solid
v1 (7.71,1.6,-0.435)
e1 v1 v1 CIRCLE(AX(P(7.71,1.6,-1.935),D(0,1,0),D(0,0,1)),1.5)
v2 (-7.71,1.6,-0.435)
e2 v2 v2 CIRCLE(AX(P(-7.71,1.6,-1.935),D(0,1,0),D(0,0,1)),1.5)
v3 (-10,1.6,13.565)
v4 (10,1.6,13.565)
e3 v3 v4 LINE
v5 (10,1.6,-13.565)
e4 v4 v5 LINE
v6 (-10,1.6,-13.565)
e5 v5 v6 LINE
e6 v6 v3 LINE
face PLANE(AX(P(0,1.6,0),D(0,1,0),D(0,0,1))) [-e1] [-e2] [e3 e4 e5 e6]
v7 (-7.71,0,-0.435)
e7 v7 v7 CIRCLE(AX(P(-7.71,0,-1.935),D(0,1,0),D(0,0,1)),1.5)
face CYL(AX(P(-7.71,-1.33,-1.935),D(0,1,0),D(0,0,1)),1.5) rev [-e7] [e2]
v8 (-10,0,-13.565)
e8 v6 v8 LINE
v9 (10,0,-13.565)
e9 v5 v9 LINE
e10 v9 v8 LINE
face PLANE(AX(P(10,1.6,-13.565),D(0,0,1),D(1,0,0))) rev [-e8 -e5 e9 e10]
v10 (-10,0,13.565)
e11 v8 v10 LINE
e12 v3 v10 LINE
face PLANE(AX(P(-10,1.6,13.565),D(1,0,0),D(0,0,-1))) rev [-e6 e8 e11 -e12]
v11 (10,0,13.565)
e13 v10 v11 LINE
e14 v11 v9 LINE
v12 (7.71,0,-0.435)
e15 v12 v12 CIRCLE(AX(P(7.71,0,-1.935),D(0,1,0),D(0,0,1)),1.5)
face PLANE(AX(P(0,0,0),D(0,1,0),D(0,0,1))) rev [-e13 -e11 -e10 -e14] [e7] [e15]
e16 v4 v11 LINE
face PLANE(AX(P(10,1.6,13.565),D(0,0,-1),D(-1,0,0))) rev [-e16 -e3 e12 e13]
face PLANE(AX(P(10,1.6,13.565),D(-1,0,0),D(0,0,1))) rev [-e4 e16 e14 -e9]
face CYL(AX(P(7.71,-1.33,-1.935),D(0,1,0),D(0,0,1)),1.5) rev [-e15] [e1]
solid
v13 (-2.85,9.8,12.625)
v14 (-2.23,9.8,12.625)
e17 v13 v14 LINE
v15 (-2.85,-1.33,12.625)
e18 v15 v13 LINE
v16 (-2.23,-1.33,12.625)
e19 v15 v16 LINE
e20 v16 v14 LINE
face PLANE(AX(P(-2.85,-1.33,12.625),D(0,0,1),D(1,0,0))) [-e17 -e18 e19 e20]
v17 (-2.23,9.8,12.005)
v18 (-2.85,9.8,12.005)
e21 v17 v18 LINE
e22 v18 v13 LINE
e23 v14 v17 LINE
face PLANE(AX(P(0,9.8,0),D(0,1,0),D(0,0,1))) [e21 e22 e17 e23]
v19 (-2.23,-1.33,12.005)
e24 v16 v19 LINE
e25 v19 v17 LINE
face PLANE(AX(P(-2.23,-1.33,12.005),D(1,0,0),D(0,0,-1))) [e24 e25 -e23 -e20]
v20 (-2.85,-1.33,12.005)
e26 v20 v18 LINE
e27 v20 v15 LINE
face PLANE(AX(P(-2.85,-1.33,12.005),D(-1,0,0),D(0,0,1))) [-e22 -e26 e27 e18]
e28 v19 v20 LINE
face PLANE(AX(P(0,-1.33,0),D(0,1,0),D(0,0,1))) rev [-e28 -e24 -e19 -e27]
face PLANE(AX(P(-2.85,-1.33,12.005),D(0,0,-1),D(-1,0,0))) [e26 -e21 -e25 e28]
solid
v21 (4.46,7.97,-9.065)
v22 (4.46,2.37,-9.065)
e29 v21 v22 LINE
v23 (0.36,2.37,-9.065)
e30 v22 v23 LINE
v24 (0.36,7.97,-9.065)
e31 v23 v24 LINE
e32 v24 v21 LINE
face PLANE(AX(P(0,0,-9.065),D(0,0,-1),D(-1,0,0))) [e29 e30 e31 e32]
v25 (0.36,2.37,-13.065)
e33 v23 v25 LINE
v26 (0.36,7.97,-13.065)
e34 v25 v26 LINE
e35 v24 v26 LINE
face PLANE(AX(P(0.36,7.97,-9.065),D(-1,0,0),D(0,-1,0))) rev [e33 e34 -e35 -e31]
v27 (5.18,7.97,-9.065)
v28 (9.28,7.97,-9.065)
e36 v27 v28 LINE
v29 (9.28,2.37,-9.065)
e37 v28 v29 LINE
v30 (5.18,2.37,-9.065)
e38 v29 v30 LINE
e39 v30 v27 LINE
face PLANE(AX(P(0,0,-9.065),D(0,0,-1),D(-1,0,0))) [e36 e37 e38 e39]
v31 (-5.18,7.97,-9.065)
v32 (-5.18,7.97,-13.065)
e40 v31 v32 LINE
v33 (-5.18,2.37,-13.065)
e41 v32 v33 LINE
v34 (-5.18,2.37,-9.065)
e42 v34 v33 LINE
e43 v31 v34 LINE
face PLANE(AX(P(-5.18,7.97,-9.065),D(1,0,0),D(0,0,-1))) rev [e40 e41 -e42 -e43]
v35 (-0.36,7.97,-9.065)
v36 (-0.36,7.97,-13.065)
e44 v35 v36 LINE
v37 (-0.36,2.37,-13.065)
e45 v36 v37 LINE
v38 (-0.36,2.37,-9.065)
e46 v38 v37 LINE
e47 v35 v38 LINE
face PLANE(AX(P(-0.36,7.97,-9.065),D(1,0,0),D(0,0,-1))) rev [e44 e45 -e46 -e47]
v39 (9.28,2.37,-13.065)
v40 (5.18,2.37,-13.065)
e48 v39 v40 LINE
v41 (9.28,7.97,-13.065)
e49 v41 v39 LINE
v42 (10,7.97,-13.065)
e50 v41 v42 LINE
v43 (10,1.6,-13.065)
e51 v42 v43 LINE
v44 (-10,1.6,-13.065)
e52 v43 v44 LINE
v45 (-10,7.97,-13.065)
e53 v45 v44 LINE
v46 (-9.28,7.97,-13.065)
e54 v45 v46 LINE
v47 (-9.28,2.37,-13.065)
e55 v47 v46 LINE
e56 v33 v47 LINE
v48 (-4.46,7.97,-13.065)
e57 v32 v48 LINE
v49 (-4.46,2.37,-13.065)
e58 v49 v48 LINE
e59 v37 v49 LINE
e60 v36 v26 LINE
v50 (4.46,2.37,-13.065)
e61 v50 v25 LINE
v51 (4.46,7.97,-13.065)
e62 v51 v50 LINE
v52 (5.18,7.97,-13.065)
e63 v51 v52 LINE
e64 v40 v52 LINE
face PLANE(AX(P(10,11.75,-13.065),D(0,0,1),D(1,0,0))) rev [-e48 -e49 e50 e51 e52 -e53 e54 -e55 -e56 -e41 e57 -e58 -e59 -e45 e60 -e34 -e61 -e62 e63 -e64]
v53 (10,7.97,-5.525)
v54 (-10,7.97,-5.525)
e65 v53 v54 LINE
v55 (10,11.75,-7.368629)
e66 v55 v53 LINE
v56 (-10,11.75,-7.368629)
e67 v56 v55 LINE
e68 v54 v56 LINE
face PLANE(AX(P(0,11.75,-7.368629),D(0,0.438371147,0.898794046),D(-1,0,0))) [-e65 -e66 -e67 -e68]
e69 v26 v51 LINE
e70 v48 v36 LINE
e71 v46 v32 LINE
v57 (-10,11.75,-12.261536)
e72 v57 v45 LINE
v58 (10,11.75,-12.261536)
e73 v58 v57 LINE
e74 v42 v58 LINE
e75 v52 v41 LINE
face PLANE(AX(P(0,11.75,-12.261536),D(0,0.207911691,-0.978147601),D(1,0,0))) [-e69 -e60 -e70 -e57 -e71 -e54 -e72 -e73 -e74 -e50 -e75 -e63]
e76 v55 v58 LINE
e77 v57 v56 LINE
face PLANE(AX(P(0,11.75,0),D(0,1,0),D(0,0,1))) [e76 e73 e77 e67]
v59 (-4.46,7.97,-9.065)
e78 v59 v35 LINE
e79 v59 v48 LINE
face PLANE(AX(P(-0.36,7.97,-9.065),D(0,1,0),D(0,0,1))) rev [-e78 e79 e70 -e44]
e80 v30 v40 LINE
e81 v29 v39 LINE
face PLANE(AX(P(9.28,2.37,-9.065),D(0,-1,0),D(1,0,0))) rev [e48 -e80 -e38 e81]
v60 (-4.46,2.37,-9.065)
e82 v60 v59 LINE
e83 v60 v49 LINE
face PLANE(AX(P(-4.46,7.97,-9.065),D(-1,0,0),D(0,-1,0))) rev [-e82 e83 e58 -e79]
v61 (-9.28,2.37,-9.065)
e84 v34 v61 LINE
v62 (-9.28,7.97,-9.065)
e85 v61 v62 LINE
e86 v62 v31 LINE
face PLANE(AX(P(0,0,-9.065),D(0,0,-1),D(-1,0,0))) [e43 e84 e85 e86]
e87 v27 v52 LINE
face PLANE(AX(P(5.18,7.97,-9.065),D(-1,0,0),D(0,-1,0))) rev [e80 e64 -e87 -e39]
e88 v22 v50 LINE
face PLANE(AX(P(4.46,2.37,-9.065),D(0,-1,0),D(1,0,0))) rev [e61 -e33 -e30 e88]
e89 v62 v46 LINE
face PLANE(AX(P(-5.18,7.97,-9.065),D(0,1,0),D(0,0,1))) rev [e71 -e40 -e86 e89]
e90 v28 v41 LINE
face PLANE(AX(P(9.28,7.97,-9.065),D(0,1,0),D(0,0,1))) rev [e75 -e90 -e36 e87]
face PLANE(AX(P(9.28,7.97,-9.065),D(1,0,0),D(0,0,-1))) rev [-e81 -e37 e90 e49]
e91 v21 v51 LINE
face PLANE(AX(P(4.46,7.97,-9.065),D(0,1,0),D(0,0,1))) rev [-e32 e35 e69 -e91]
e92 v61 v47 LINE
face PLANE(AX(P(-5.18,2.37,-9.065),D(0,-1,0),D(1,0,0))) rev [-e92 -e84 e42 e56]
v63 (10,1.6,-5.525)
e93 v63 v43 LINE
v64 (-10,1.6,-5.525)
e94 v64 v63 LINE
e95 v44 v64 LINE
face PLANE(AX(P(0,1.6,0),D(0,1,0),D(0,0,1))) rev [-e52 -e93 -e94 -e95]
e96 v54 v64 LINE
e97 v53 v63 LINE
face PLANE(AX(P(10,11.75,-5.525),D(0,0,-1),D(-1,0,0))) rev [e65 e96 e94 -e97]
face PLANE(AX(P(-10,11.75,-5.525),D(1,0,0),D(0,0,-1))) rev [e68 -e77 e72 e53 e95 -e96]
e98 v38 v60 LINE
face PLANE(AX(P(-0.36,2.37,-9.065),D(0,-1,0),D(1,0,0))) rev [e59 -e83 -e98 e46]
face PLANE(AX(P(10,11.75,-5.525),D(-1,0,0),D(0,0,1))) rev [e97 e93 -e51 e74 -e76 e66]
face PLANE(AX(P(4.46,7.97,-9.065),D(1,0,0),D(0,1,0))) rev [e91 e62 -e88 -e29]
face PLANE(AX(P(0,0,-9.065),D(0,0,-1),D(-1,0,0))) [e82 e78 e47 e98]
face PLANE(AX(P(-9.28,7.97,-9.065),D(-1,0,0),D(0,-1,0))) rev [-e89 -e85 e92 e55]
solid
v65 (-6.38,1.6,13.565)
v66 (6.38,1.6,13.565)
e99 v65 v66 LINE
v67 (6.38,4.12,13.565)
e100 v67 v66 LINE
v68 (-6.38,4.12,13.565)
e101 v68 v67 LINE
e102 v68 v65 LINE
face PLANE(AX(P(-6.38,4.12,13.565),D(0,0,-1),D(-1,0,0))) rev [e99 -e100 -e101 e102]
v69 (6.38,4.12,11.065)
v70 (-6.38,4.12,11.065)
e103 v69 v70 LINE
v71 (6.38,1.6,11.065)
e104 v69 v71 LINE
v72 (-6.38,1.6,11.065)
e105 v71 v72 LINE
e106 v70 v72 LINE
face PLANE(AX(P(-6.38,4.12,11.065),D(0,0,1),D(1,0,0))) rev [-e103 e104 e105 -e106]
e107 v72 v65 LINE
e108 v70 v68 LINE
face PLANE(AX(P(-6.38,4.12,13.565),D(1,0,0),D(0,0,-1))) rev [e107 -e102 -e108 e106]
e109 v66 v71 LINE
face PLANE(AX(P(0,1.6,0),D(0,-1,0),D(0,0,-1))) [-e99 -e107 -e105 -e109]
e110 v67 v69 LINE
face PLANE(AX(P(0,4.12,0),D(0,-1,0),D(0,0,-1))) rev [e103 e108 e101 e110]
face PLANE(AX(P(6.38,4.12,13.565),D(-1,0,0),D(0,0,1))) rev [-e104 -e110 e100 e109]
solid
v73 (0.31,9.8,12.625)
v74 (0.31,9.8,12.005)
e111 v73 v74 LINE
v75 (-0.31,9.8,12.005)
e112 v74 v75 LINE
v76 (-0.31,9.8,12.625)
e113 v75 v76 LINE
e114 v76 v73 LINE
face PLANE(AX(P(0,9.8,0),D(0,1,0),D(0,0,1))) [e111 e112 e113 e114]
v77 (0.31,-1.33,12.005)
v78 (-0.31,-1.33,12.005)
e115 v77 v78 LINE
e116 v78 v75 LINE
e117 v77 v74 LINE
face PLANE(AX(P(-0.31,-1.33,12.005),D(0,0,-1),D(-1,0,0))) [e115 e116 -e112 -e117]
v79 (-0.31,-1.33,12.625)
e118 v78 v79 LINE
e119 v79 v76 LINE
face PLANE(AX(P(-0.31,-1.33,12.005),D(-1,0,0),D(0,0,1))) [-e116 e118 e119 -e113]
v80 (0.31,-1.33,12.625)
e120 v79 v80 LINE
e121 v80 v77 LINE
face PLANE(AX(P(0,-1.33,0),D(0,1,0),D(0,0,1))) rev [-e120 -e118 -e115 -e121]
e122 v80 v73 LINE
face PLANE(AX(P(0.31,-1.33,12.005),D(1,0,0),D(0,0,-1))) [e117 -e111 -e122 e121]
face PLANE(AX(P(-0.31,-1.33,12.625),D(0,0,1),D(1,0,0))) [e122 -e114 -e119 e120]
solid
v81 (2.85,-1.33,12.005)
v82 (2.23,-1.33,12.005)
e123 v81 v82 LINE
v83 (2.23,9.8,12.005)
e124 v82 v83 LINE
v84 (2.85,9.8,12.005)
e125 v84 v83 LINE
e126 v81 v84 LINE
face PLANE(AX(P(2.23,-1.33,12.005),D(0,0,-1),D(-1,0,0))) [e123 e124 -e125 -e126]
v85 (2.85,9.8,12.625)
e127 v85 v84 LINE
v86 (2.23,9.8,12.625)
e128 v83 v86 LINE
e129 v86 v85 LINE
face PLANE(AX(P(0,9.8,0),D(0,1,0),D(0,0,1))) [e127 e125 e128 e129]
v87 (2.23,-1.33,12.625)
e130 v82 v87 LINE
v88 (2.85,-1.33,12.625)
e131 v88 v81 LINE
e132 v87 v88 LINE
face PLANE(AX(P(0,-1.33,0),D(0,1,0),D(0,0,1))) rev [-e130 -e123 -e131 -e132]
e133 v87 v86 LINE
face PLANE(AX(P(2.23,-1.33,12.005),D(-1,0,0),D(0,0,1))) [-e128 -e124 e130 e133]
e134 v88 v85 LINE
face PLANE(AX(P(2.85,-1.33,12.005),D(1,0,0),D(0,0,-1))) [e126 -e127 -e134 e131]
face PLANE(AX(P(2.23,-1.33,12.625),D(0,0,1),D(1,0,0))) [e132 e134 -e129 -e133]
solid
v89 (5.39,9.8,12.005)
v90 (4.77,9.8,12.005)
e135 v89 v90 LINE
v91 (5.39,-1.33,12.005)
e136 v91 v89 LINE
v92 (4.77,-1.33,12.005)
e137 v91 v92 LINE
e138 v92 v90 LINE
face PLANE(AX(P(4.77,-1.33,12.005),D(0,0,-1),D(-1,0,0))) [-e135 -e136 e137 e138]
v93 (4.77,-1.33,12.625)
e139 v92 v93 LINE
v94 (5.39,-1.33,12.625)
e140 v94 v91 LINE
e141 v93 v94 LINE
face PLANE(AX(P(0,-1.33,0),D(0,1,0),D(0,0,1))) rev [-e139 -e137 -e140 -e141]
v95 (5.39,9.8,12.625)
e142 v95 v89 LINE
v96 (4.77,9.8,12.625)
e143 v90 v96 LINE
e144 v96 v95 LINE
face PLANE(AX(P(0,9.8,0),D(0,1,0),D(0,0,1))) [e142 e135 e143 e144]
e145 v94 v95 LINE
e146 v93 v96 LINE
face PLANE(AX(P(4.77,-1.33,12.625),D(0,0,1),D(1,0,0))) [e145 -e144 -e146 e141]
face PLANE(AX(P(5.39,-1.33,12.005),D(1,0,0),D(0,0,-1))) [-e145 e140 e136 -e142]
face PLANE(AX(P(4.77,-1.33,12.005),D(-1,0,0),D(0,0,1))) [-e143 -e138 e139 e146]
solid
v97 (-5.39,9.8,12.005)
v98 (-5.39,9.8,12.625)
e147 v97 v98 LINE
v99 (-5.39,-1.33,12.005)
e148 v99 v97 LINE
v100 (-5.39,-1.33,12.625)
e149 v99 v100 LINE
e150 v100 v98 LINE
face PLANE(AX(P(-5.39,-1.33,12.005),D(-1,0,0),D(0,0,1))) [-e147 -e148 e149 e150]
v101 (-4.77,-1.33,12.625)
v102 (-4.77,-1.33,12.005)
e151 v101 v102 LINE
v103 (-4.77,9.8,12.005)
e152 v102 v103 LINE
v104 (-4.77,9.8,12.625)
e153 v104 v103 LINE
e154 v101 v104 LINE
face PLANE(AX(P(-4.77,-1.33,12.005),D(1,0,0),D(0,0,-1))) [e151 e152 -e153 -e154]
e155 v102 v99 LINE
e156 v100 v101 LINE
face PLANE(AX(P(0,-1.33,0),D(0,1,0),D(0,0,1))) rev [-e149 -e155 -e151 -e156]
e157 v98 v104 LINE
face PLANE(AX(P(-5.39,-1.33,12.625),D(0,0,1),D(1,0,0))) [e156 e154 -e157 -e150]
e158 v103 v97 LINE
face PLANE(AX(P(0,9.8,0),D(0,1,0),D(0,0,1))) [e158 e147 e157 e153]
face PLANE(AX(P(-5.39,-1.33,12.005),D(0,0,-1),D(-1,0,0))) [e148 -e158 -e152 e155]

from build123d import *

# Parameters (mm, degrees)
SKETCH1_W                  = 20
SKETCH1_H                  = 27.13
BOSS_EXTRUDE1_DEPTH        = 1.6
SKETCH2_W                  = 12.76
SKETCH2_H                  = 2.5
BOSS_EXTRUDE2_DEPTH        = 2.52
BOSS_EXTRUDE3_DEPTH        = 5.68
BOSS_EXTRUDE3_DEPTH_BACK   = 5.45
SKETCH3_W                  = 0.62
SKETCH3_H                  = 0.62
BOSS_EXTRUDE3_2_DEPTH      = 5.68
BOSS_EXTRUDE3_2_DEPTH_BACK = 5.45
BOSS_EXTRUDE3_3_DEPTH      = 5.68
BOSS_EXTRUDE3_3_DEPTH_BACK = 5.45
BOSS_EXTRUDE3_4_DEPTH      = 5.68
BOSS_EXTRUDE3_4_DEPTH_BACK = 5.45
BOSS_EXTRUDE3_5_DEPTH      = 5.68
BOSS_EXTRUDE3_5_DEPTH_BACK = 5.45
SKETCH4_W                  = 20
SKETCH4_H                  = 7.54
BOSS_EXTRUDE4_DEPTH        = 10.15
SKETCH5_W                  = 4.1
SKETCH5_H                  = 5.6
CUT_EXTRUDE1_DEPTH         = 4
CHAMFER1_SIZE              = 0.803463803
CHAMFER1_SIZE_2            = 3.78
CHAMFER2_SIZE              = 3.78
CHAMFER2_SIZE2             = 1.843629185
SKETCH6_R                  = 1.5
CUT_EXTRUDE2_DEPTH         = 20.673121893


with BuildPart() as part:
    # Sketch1 → Boss-Extrude1 (new body)
    with BuildSketch(Plane(origin=(0, 0, 0), x_dir=(1, 0, 0), z_dir=(0, 1, 0))):
        Rectangle(SKETCH1_W, SKETCH1_H)
    extrude(amount=BOSS_EXTRUDE1_DEPTH)

    # Sketch6 → Cut-Extrude2 (cut, through all)
    with BuildSketch(Plane(origin=(0, 1.6, 0), x_dir=(1, 0, 0), z_dir=(0, 1, 0))):
        with Locations(Location((-7.71, 1.935, 0), (0, 0, 270))):
            Circle(SKETCH6_R)
        with Locations(Location((7.71, 1.935, 0), (0, 0, 270))):
            Circle(SKETCH6_R)
    extrude(amount=-CUT_EXTRUDE2_DEPTH, mode=Mode.SUBTRACT)


with BuildPart() as body_2:
    # Sketch2 → Boss-Extrude2 (new body)
    with BuildSketch(Plane(origin=(0, 1.6, 0), x_dir=(1, 0, 0), z_dir=(0, 1, 0))):
        with Locations((0, -12.315)):
            Rectangle(SKETCH2_W, SKETCH2_H)
    extrude(amount=BOSS_EXTRUDE2_DEPTH)


with BuildPart() as body_3:
    # Sketch3 → Boss-Extrude3 (new, two sides: drawn at the far end of the back side and taken through both)
    with BuildSketch(Plane(origin=(0, 4.12, 0), x_dir=(1, 0, 0), z_dir=(0, 1, 0)).offset(-BOSS_EXTRUDE3_DEPTH_BACK)):
        with Locations((-5.08, -12.315)):
            Rectangle(SKETCH3_W, SKETCH3_H)
    extrude(amount=BOSS_EXTRUDE3_DEPTH + BOSS_EXTRUDE3_DEPTH_BACK)


with BuildPart() as body_4:
    # Sketch3 → Boss-Extrude3 2 (new, two sides: drawn at the far end of the back side and taken through both)
    with BuildSketch(Plane(origin=(0, 4.12, 0), x_dir=(1, 0, 0), z_dir=(0, 1, 0)).offset(-BOSS_EXTRUDE3_2_DEPTH_BACK)):
        with Locations((-2.54, -12.315)):
            Rectangle(SKETCH3_W, SKETCH3_H)
    extrude(amount=BOSS_EXTRUDE3_2_DEPTH + BOSS_EXTRUDE3_2_DEPTH_BACK)


with BuildPart() as body_5:
    # Sketch3 → Boss-Extrude3 3 (new, two sides: drawn at the far end of the back side and taken through both)
    with BuildSketch(Plane(origin=(0, 4.12, 0), x_dir=(1, 0, 0), z_dir=(0, 1, 0)).offset(-BOSS_EXTRUDE3_3_DEPTH_BACK)):
        with Locations((0, -12.315)):
            Rectangle(SKETCH3_W, SKETCH3_H)
    extrude(amount=BOSS_EXTRUDE3_3_DEPTH + BOSS_EXTRUDE3_3_DEPTH_BACK)


with BuildPart() as body_6:
    # Sketch3 → Boss-Extrude3 4 (new, two sides: drawn at the far end of the back side and taken through both)
    with BuildSketch(Plane(origin=(0, 4.12, 0), x_dir=(1, 0, 0), z_dir=(0, 1, 0)).offset(-BOSS_EXTRUDE3_4_DEPTH_BACK)):
        with Locations((2.54, -12.315)):
            Rectangle(SKETCH3_W, SKETCH3_H)
    extrude(amount=BOSS_EXTRUDE3_4_DEPTH + BOSS_EXTRUDE3_4_DEPTH_BACK)


with BuildPart() as body_7:
    # Sketch3 → Boss-Extrude3 5 (new, two sides: drawn at the far end of the back side and taken through both)
    with BuildSketch(Plane(origin=(0, 4.12, 0), x_dir=(1, 0, 0), z_dir=(0, 1, 0)).offset(-BOSS_EXTRUDE3_5_DEPTH_BACK)):
        with Locations((5.08, -12.315)):
            Rectangle(SKETCH3_W, SKETCH3_H)
    extrude(amount=BOSS_EXTRUDE3_5_DEPTH + BOSS_EXTRUDE3_5_DEPTH_BACK)


with BuildPart() as body_8:
    # Sketch4 → Boss-Extrude4 (new body)
    with BuildSketch(Plane(origin=(0, 1.6, 0), x_dir=(1, 0, 0), z_dir=(0, 1, 0))):
        with Locations((0, 9.295)):
            Rectangle(SKETCH4_W, SKETCH4_H)
    extrude(amount=BOSS_EXTRUDE4_DEPTH)

    # Sketch5 → Cut-Extrude1 (cut)
    with BuildSketch(Plane(origin=(0, 0, -13.065), x_dir=(-1, 0, 0), z_dir=(0, 0, -1))):
        with Locations((-7.23, 5.17)):
            Rectangle(SKETCH5_W, SKETCH5_H)
        with Locations((-2.41, 5.17)):
            Rectangle(SKETCH5_W, SKETCH5_H)
        with Locations((2.41, 5.17)):
            Rectangle(SKETCH5_W, SKETCH5_H)
        with Locations((7.23, 5.17)):
            Rectangle(SKETCH5_W, SKETCH5_H)
    extrude(amount=-CUT_EXTRUDE1_DEPTH, mode=Mode.SUBTRACT)

    # Chamfer1
    # the kernel refuses this chamfer: 3.78, 0.803463803 mm, written as the material it takes off along each edge
    with BuildSketch(Plane(origin=(-19.820054281, 11.75, -13.065), x_dir=(0, 0.1744265095150599, 0.9846701949274146), z_dir=(1, 0, 0))) as chamfer1_piece_1:
        Polygon((CHAMFER1_SIZE * 0.984670195066, CHAMFER1_SIZE * 0.17442650954), (-CHAMFER1_SIZE_2 * 0.174426509515, CHAMFER1_SIZE_2 * 0.984670194927), (0, 0), align=None)
    extrude(amount=39.640108563, mode=Mode.SUBTRACT)

    # Chamfer2
    chamfer2_edges = [body_8.edges().sort_by_distance(p)[0] for p in [
        (0, 11.75, -5.525),
    ]]
    chamfer2_side = [body_8.faces().sort_by_distance(p)[0] for p in [
        (0, 6.675, -5.525),
    ]]
    chamfer(chamfer2_edges, length=CHAMFER2_SIZE, length2=CHAMFER2_SIZE2, reference=chamfer2_side[0])


solid = Compound([part.part, body_2.part, body_3.part, body_4.part, body_5.part, body_6.part, body_7.part, body_8.part])
